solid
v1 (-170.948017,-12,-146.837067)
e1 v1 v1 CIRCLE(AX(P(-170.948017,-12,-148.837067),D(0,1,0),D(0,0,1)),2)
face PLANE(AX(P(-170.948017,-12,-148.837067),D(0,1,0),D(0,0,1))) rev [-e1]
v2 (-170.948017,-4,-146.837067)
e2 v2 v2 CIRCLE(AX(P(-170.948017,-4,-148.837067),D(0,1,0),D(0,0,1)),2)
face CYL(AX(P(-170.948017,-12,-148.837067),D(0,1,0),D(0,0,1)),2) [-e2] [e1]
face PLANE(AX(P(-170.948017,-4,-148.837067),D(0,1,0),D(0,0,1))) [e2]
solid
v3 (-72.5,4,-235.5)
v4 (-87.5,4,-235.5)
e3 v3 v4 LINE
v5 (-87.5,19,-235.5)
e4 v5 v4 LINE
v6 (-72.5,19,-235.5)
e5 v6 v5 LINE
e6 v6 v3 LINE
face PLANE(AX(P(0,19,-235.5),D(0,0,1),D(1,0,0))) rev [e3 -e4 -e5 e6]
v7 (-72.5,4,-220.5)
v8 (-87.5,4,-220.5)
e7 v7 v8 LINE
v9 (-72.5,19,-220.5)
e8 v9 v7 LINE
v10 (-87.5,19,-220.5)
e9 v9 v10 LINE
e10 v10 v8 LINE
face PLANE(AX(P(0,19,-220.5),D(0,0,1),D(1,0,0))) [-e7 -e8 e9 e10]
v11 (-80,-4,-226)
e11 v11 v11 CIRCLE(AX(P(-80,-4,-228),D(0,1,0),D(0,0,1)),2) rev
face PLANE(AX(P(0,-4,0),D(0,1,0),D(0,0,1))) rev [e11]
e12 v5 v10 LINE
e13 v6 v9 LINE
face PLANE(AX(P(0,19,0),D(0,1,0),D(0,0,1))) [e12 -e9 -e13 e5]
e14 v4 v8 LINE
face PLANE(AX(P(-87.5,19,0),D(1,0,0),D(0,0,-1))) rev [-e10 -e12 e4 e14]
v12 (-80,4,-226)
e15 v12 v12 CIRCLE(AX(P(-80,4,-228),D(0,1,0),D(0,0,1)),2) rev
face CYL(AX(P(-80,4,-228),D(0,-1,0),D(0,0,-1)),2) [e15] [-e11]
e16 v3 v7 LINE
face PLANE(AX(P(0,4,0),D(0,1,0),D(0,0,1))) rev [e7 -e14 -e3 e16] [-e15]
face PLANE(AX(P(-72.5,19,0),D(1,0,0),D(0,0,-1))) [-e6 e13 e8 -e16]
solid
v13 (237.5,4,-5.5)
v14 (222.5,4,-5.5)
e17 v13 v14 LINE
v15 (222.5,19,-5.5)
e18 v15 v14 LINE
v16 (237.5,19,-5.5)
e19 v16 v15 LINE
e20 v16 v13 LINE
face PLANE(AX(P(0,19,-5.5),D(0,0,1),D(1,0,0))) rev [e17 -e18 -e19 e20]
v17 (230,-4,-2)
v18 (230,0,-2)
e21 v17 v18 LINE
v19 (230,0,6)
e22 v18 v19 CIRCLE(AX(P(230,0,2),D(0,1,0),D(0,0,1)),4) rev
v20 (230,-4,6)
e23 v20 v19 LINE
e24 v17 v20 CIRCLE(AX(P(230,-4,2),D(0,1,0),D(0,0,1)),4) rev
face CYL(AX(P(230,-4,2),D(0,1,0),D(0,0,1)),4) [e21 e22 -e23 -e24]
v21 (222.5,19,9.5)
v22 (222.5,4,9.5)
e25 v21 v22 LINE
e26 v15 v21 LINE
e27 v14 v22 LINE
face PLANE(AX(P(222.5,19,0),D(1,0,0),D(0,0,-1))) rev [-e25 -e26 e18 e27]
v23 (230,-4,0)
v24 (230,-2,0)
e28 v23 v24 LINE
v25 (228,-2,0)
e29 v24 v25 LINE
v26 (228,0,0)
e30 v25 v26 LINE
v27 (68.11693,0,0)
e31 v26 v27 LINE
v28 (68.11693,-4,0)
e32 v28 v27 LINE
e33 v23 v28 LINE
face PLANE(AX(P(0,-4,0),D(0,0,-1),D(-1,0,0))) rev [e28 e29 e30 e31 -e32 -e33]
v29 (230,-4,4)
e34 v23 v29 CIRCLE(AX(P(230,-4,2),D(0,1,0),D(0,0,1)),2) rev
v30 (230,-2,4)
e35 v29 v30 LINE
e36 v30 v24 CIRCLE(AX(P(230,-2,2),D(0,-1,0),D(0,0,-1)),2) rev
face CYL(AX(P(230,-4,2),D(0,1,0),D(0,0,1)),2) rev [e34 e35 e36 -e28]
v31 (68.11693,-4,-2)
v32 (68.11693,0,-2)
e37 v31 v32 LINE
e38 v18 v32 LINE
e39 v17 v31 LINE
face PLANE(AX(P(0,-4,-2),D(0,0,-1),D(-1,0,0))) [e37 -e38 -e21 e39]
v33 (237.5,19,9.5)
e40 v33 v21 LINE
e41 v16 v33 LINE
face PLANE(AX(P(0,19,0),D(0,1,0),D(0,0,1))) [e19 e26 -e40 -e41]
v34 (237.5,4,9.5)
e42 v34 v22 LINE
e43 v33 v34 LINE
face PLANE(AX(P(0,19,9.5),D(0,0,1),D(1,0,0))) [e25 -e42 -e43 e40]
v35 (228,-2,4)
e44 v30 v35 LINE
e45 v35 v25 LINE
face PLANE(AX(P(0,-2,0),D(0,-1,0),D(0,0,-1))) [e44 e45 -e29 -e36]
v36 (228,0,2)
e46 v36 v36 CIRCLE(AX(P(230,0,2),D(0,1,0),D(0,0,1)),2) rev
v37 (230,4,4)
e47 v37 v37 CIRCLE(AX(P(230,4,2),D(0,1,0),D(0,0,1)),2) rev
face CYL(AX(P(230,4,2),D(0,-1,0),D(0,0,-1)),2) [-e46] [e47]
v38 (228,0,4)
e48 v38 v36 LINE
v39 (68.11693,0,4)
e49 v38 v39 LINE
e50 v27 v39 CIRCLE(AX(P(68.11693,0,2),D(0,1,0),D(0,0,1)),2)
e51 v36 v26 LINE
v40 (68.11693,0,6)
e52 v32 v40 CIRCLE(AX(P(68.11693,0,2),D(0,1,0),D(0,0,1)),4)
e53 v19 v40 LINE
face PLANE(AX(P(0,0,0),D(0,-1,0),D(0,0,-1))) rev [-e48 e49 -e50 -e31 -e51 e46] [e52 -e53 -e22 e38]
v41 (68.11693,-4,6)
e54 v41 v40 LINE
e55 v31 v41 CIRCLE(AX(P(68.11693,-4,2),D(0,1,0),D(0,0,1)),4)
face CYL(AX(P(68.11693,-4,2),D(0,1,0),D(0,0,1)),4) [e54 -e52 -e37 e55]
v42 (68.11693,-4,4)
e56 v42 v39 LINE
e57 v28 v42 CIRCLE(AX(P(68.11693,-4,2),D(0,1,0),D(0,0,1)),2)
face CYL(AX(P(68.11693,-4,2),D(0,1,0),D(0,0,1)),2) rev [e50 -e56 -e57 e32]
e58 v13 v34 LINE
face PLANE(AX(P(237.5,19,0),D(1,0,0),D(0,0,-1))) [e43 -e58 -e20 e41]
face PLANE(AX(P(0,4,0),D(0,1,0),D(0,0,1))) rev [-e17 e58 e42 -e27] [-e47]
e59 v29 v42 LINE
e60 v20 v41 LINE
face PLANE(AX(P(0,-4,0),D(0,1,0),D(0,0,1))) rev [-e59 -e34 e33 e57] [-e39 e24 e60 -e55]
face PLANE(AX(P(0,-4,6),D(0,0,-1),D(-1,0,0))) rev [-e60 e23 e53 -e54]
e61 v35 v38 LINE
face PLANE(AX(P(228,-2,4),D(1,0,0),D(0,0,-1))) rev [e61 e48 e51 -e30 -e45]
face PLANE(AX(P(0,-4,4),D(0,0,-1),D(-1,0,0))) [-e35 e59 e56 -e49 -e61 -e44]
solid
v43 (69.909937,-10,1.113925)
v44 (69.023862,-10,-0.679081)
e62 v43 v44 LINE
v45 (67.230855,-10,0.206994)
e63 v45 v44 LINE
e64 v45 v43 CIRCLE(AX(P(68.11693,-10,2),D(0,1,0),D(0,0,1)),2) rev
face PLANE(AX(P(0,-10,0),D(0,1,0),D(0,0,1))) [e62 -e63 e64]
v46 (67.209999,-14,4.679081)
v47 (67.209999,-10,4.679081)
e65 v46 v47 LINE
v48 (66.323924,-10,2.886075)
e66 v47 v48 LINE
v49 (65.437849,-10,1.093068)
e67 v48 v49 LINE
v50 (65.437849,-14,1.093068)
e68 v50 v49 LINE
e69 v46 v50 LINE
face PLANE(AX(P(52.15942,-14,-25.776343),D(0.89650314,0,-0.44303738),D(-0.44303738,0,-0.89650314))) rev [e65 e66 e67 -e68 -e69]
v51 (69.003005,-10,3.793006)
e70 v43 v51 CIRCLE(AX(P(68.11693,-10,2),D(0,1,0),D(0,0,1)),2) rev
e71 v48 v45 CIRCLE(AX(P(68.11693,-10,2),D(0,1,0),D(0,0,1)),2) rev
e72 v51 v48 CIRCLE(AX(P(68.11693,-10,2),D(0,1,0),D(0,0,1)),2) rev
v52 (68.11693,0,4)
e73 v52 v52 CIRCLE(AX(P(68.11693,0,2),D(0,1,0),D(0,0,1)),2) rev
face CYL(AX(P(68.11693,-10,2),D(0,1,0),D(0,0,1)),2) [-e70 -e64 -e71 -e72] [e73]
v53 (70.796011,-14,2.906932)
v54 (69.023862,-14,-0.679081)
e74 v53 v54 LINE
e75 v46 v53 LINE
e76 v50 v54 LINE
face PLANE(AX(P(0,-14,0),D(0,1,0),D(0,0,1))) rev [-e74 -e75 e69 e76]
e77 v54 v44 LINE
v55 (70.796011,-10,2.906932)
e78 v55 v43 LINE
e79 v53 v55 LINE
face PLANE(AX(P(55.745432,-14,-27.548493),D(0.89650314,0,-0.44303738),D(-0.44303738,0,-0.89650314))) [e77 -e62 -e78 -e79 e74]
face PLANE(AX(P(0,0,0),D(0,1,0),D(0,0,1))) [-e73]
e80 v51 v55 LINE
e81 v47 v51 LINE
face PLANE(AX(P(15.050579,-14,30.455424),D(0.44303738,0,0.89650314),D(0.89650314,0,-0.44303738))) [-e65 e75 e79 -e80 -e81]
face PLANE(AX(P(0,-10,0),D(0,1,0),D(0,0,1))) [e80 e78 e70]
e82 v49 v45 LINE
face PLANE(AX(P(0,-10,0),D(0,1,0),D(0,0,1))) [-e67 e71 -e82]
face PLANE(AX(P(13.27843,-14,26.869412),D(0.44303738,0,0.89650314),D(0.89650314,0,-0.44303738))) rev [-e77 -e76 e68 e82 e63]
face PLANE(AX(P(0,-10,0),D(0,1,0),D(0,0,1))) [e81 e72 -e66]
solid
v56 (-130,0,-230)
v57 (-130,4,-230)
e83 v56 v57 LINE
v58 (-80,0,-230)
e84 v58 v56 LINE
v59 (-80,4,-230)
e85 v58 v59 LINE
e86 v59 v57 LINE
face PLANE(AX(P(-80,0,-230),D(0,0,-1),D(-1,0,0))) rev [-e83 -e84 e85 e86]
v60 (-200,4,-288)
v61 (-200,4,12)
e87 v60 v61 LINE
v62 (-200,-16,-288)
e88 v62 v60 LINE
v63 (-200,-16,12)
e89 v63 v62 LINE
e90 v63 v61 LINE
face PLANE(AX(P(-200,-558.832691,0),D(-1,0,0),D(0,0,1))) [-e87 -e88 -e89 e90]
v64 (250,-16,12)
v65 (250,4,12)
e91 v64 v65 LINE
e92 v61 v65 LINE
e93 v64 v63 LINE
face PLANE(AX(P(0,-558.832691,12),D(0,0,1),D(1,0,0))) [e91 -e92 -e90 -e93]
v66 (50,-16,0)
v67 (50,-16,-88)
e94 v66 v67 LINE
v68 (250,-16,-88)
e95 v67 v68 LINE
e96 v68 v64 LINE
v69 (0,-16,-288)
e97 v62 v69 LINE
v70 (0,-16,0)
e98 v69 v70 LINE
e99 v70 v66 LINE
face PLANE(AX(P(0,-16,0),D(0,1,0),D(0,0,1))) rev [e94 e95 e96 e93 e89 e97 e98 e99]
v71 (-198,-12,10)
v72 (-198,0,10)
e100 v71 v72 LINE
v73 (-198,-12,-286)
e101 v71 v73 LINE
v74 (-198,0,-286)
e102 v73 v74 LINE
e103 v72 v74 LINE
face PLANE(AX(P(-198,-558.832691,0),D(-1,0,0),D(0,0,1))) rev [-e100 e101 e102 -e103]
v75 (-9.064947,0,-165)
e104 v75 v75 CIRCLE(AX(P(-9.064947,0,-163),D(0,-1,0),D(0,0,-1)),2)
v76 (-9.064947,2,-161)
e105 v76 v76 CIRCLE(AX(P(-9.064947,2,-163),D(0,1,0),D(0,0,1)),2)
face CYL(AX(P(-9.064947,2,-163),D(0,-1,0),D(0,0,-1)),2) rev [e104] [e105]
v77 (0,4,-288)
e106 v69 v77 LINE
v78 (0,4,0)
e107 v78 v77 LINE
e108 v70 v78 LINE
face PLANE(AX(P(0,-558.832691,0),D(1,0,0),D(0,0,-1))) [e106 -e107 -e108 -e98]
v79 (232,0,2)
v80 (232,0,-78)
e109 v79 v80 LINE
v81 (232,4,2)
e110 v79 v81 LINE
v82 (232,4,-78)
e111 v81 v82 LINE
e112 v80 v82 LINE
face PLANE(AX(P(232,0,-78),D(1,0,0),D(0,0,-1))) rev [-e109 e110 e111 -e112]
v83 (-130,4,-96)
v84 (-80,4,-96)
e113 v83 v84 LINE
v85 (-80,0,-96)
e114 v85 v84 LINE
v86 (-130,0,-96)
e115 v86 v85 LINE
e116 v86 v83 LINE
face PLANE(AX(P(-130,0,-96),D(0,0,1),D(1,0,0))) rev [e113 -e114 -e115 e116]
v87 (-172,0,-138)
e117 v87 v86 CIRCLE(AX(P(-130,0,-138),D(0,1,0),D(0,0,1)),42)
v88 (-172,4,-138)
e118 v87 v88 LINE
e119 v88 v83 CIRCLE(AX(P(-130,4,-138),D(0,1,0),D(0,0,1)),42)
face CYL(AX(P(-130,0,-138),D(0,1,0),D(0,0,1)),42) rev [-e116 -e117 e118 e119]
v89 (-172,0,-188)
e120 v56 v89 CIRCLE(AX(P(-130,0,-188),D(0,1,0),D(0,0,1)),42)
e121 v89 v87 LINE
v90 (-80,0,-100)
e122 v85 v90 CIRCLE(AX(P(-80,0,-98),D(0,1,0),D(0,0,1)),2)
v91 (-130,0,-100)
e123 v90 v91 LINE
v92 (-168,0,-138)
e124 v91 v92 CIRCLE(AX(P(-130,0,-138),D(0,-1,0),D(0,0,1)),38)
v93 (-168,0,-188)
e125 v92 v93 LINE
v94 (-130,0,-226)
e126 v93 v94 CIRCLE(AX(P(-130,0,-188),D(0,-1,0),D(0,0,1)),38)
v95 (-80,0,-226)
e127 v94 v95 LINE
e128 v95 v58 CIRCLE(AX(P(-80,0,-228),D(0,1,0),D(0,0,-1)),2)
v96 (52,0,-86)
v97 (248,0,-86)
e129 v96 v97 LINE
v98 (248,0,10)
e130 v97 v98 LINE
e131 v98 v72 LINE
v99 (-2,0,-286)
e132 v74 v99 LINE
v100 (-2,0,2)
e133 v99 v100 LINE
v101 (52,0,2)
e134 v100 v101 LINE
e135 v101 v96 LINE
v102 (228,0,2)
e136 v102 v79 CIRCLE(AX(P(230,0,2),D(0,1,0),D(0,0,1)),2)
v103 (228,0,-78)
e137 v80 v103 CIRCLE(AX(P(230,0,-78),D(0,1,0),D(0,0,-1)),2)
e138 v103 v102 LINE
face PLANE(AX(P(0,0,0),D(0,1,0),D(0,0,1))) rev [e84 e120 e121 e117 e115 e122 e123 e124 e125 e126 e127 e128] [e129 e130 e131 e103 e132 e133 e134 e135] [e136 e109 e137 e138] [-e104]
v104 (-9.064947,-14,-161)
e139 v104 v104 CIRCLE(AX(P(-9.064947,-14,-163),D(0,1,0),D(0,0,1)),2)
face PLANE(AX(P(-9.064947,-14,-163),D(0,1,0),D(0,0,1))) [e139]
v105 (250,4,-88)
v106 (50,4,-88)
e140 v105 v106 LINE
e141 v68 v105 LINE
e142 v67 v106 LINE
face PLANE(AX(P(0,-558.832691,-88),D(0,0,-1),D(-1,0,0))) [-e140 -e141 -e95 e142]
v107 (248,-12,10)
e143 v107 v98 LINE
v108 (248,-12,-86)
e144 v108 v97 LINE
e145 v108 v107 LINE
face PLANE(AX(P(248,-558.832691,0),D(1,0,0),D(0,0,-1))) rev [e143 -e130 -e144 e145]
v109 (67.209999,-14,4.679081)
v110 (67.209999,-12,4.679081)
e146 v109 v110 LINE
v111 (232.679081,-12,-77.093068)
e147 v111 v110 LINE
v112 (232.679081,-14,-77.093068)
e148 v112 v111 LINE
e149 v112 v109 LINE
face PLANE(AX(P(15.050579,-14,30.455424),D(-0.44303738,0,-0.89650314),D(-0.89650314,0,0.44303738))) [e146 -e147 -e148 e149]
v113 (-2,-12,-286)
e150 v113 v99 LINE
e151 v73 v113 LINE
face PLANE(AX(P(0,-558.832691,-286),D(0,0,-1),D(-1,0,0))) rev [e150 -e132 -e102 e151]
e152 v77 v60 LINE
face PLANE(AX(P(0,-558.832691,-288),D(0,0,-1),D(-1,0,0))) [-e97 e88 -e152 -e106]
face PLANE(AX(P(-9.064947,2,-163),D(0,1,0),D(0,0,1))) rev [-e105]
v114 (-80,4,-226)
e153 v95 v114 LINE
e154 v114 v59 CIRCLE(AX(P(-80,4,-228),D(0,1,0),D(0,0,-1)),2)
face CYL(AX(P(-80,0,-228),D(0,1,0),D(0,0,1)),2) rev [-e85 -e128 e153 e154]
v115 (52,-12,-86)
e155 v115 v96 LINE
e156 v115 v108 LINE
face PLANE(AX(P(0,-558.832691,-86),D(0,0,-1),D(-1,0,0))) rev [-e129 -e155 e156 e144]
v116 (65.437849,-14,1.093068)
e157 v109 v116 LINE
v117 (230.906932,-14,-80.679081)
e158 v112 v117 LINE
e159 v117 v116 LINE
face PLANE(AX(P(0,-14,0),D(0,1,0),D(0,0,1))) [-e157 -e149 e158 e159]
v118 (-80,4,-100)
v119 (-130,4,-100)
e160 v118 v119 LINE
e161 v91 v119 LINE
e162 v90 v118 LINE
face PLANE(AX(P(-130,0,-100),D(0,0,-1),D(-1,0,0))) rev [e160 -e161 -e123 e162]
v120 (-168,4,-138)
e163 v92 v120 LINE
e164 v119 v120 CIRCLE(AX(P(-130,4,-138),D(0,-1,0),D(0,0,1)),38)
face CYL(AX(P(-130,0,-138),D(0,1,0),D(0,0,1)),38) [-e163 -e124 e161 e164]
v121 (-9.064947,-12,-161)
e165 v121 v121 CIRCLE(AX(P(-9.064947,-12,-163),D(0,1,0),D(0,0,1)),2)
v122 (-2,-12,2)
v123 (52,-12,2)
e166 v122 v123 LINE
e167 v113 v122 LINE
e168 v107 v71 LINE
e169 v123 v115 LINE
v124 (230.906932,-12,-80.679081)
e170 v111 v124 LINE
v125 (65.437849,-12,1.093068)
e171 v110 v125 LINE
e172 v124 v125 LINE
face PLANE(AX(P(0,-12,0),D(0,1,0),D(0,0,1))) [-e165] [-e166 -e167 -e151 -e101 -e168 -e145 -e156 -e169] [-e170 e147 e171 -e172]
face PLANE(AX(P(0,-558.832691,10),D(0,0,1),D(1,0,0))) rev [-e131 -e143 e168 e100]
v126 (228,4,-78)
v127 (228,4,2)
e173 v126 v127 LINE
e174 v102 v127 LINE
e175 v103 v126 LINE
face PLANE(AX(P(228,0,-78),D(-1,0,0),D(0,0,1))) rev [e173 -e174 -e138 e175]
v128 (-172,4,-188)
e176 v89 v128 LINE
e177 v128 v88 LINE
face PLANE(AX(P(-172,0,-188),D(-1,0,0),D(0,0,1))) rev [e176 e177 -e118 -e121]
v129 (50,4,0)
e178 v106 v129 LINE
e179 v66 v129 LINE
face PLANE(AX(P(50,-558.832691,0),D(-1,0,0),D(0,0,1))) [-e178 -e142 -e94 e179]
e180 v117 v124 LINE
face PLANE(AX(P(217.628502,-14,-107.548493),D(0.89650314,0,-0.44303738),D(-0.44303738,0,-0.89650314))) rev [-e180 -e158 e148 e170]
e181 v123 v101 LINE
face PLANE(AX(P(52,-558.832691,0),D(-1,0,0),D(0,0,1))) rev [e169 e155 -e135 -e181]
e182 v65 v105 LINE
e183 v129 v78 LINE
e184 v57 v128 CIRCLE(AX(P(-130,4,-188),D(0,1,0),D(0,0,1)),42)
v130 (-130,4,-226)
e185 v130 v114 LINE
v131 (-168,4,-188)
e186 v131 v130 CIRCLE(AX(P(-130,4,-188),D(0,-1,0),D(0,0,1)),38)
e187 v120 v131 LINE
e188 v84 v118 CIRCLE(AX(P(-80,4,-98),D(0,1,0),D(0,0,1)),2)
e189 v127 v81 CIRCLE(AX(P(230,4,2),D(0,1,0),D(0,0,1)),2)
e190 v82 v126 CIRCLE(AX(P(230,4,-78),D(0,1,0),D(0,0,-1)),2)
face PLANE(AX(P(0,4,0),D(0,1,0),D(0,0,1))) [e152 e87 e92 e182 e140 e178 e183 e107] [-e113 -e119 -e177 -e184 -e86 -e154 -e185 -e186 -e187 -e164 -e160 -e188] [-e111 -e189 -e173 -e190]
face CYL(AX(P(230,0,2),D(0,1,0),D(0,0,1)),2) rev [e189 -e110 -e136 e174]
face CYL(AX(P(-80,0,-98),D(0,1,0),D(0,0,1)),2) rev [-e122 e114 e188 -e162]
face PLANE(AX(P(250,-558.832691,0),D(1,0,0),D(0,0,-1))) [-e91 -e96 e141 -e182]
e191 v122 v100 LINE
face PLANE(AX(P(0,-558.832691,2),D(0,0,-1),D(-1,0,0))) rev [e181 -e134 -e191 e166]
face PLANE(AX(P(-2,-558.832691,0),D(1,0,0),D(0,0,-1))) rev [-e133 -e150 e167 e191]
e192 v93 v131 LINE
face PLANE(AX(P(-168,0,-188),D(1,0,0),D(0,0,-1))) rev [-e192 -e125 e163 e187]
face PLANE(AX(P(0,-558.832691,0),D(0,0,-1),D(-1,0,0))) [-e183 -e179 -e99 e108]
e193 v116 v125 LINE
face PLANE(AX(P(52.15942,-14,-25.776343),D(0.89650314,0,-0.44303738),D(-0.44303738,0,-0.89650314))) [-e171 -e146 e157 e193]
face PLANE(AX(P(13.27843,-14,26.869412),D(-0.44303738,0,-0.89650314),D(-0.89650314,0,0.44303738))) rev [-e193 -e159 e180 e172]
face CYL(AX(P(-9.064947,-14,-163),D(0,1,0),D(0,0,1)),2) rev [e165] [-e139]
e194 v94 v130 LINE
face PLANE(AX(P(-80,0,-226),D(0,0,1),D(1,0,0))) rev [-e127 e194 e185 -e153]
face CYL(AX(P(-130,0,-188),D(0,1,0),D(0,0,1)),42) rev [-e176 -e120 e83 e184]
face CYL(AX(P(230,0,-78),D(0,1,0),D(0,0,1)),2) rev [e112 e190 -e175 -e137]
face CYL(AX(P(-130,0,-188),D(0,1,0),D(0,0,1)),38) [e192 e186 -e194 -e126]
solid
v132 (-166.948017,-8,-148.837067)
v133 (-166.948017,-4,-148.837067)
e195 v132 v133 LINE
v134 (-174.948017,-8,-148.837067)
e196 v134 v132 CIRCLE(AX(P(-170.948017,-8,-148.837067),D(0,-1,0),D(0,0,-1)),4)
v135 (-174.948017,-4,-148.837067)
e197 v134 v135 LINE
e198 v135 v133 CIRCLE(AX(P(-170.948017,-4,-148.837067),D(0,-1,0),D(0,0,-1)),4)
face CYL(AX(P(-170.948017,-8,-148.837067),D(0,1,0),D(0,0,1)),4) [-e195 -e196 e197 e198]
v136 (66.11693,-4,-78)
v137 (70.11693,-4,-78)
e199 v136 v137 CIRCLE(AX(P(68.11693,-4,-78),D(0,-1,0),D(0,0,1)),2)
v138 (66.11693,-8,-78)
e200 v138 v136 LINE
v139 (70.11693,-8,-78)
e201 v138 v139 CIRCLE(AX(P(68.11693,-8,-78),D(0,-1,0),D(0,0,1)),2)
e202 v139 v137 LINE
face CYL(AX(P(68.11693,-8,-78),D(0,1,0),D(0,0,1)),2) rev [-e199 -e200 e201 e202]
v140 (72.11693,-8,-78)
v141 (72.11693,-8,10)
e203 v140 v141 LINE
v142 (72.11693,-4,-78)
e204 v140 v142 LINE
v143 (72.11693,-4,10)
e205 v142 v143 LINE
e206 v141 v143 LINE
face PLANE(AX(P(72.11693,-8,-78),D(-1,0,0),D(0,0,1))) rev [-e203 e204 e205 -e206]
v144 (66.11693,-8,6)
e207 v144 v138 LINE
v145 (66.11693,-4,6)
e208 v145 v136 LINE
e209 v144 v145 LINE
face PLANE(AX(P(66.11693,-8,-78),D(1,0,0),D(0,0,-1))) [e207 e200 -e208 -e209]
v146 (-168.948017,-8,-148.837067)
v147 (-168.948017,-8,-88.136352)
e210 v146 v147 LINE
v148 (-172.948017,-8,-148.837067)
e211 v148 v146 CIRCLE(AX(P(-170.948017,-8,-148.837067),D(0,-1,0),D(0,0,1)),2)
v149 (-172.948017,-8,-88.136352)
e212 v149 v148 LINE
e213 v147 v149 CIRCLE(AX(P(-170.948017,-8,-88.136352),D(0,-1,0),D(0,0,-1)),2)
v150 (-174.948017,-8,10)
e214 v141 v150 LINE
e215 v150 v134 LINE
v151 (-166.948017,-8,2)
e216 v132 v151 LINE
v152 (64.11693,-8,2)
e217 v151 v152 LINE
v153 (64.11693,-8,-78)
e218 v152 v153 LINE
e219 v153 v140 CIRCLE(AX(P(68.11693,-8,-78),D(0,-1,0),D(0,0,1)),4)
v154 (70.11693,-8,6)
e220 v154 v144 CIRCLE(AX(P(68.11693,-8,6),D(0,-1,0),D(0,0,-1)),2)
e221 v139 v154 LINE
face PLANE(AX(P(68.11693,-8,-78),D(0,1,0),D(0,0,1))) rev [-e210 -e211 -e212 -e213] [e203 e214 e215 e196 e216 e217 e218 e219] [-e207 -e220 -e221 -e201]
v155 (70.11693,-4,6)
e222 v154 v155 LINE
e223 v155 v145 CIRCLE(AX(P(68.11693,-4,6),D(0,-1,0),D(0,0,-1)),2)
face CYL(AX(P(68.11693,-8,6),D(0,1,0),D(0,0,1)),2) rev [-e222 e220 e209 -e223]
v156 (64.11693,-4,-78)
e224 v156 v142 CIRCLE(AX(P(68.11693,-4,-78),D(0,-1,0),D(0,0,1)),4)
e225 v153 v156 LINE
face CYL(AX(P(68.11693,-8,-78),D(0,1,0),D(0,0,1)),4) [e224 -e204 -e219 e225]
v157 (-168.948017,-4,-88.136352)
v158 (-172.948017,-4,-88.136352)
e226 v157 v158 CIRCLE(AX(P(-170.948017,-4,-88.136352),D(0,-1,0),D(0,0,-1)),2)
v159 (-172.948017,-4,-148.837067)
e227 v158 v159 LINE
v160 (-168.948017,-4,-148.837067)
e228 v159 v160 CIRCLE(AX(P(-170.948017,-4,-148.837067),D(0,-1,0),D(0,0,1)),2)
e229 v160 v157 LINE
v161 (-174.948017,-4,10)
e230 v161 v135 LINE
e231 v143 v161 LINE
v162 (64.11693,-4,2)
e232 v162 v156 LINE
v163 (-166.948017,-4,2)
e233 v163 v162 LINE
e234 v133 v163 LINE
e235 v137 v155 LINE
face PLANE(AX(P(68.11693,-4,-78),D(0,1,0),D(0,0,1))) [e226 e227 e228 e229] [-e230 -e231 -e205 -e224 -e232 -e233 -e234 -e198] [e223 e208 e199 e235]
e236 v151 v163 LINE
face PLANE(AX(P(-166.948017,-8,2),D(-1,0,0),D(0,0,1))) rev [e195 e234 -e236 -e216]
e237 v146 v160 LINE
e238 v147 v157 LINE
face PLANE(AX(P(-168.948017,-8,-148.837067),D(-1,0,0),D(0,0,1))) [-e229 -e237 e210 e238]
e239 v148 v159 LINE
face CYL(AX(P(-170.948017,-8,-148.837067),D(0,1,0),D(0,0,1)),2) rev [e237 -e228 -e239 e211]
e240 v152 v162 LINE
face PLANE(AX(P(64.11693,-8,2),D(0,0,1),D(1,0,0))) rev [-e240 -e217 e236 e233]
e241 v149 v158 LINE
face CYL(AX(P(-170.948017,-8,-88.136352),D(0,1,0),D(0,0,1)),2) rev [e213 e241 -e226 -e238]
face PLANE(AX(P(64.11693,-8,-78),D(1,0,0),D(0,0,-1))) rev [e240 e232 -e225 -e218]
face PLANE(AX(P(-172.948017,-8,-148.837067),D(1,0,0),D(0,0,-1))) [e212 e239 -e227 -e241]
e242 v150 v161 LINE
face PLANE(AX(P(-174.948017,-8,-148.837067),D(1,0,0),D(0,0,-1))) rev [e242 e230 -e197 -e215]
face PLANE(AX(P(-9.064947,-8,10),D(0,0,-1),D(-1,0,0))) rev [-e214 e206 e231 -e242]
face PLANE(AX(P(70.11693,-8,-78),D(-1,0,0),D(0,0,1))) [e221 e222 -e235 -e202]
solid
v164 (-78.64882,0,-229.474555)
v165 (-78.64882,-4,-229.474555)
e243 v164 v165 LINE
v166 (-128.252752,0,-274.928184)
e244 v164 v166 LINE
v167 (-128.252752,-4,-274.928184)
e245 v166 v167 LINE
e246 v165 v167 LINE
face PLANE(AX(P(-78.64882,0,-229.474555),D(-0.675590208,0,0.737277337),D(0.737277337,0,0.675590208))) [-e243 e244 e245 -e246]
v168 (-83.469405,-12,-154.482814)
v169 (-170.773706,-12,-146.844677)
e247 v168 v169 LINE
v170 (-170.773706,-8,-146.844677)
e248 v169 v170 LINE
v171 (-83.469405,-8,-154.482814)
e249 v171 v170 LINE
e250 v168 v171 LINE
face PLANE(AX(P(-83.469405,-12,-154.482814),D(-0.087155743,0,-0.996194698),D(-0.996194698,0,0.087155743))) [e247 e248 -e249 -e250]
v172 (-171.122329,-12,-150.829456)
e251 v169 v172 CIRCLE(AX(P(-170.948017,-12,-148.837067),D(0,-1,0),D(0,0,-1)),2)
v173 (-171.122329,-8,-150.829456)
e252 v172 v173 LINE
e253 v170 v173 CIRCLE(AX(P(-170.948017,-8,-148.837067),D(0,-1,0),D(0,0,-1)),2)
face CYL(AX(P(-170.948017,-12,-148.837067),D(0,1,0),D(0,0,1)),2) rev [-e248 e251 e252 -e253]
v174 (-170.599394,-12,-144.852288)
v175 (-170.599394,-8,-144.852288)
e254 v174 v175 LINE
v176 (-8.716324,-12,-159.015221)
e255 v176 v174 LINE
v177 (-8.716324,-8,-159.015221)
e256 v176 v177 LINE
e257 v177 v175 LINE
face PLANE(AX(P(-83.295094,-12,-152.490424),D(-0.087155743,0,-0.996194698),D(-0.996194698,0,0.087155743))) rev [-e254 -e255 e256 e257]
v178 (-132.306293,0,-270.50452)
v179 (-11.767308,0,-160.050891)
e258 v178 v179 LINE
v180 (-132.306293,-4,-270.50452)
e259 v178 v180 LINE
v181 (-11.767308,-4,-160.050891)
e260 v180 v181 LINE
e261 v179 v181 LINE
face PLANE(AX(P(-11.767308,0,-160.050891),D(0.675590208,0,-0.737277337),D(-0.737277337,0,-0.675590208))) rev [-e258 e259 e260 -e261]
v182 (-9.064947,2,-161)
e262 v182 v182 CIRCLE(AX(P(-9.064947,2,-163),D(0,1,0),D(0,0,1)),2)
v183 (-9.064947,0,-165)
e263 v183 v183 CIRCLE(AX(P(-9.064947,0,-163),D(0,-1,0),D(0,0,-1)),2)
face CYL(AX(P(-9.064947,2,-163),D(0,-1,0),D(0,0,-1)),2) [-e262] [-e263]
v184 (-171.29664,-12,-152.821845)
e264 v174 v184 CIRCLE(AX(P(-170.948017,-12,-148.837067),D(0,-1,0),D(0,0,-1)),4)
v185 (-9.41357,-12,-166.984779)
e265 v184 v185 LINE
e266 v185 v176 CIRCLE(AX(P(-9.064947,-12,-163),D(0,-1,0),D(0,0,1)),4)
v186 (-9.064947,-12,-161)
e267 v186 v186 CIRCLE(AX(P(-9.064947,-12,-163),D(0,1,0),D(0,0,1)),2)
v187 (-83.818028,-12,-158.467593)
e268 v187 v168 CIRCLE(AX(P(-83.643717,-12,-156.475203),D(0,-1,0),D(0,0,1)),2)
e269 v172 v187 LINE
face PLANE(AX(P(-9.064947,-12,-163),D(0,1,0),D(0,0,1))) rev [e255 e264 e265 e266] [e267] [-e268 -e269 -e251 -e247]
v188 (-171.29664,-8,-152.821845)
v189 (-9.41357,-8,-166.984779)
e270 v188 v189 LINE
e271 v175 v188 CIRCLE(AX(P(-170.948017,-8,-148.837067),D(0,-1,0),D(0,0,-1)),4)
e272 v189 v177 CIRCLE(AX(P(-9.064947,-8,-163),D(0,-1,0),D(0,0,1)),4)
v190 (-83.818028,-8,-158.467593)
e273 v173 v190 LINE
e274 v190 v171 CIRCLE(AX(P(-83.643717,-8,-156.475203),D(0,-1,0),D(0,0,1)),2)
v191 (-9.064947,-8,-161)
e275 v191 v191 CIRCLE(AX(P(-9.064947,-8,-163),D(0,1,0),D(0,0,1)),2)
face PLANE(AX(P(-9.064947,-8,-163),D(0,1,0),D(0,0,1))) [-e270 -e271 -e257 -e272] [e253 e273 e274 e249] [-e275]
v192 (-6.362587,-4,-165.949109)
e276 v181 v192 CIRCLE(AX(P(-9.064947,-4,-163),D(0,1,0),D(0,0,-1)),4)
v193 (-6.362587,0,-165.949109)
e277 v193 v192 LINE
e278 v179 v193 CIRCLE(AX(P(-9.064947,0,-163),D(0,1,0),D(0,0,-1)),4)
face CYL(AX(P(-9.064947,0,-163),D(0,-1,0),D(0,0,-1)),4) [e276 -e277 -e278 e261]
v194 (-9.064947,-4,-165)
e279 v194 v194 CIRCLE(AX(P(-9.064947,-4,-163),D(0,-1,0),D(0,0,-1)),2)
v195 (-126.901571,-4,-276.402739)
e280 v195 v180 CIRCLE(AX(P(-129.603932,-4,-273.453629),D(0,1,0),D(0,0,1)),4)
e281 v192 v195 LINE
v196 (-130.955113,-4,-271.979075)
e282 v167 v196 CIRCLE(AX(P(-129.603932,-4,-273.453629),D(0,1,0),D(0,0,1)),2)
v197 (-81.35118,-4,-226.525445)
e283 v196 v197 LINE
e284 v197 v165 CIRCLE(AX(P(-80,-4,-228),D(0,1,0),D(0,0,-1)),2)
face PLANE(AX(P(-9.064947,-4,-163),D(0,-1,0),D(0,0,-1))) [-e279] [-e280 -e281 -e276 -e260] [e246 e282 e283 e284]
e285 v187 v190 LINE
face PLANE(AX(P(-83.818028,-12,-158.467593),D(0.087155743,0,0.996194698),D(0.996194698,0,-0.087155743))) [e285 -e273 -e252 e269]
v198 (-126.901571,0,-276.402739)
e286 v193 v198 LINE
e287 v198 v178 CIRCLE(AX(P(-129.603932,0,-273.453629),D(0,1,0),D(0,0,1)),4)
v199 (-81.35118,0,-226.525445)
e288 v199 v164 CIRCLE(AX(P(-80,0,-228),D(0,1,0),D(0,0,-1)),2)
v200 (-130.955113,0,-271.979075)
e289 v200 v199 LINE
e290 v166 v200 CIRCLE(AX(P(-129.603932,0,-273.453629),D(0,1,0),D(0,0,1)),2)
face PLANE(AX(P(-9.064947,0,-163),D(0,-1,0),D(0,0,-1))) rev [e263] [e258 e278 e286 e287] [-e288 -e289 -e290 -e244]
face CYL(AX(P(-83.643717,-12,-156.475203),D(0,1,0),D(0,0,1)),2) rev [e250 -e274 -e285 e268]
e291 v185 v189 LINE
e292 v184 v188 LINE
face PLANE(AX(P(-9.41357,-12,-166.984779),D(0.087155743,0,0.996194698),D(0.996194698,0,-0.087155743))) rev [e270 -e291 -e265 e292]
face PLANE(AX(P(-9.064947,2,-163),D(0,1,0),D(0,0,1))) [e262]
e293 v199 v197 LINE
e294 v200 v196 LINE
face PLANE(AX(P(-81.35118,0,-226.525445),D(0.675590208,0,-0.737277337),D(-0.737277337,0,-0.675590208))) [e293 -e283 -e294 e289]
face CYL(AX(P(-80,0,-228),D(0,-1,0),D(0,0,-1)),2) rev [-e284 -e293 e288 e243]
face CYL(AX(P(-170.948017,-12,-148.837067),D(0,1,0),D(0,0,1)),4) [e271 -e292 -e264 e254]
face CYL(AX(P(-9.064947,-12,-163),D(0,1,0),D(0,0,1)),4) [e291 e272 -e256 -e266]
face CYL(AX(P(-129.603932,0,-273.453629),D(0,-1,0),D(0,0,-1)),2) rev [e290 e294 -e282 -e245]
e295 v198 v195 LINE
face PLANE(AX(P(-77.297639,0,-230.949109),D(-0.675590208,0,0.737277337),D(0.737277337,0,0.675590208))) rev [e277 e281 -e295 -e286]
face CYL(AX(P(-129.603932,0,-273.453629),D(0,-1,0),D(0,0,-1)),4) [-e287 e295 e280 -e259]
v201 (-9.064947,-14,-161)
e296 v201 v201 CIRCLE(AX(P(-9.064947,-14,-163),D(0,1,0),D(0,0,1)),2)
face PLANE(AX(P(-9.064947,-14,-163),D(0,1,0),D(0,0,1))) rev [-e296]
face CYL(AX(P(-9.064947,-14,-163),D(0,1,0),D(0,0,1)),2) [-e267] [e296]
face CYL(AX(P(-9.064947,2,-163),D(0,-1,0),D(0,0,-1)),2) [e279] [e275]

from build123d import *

# Parameters (mm, degrees)
BOSS_EXTRUDE1_DEPTH       = 4
SKETCH3_3_R               = 2
BOSS_EXTRUDE2_DEPTH       = 4
BOSS_EXTRUDE3_DEPTH       = 2
BOSS_EXTRUDE4_START       = 4
SKETCH3_5_W               = 15
SKETCH3_5_H               = 15
BOSS_EXTRUDE4_DEPTH       = 15
BOSS_EXTRUDE5_DEPTH       = 4
BOSS_EXTRUDE6_DEPTH       = 4
SKETCH6_R                 = 2
BOSS_EXTRUDE7_DEPTH       = 10
BOSS_EXTRUDE8_START       = -4
SKETCH6_3_R               = 2
BOSS_EXTRUDE8_DEPTH       = 2
BOSS_EXTRUDE9_DEPTH       = 4
SKETCH8_R                 = 2
BOSS_EXTRUDE10_DEPTH      = 8
BOSS_EXTRUDE11_DEPTH      = 4
BOSS_EXTRUDE12_START      = 4
SKETCH9_3_W               = 15
SKETCH9_3_H               = 15
BOSS_EXTRUDE12_DEPTH      = 15
SKETCH10_R                = 2
BOSS_EXTRUDE13_DEPTH      = 10
BOSS_EXTRUDE14_START      = -10
BOSS_EXTRUDE14_DEPTH      = 4
BOSS_EXTRUDE15_DEPTH      = 4
BOSS_EXTRUDE15_DEPTH_BACK = 16
SHELL8_START              = -198
SHELL8_OUTLINE_W          = 16
SHELL8_OUTLINE_H          = 296
SHELL8_DEPTH              = 196
SHELL8_START_2            = 52
SHELL8_2_OUTLINE_W        = 16
SHELL8_2_OUTLINE_H        = 96
SHELL8_2_DEPTH            = 196
SHELL8_START_3            = -2
SHELL8_3_OUTLINE_W        = 16
SHELL8_3_OUTLINE_H        = 8
SHELL8_3_DEPTH            = 54
BOSS_EXTRUDE16_DEPTH      = 4
BOSS_EXTRUDE17_START      = -16
BOSS_EXTRUDE17_DEPTH      = 4
CUT_EXTRUDE1_DEPTH        = 4
INDENT1_START             = -14
INDENT1_OUTLINE_R         = 2
INDENT1_DEPTH             = 16
CUT_EXTRUDE2_DEPTH        = 2


# Read off the part's stored shape, not the designer's step: Shell8, Indent1
with BuildPart() as part:
    # Sketch3 → Boss-Extrude1 (new body)
    with BuildSketch(Plane(origin=(0, 0, 0), x_dir=(1, 0, 0), z_dir=(0, 1, 0))):
        with BuildLine():
            Line((222.5, -6), (222.5, -4))
            Line((222.5, -4), (68.116930232, -4))
            ThreePointArc((68.116930232, -4), (66.116930232, -2), (68.116930232, 0))
            Line((68.116930232, 0), (222.5, 0))
            Line((222.5, 0), (222.5, 2))
            Line((222.5, 2), (68.116930232, 2))
            ThreePointArc((68.116930232, 2), (64.116930232, -2), (68.116930232, -6))
            Line((68.116930232, -6), (222.5, -6))
        make_face()
        with BuildLine():
            Line((230, -4), (228, -4))
            Line((228, -4), (222.5, -4))
            Line((222.5, -4), (222.5, -6))
            Line((222.5, -6), (230, -6))
            ThreePointArc((230, -6), (234, -2), (230, 2))
            Line((230, 2), (222.5, 2))
            Line((222.5, 2), (222.5, 0))
            Line((222.5, 0), (228, 0))
            Line((228, 0), (230, 0))
            Line((230, 0), (232, 0))
            Line((232, 0), (232, -2))
            Line((232, -2), (232, -4))
            Line((232, -4), (230, -4))
        make_face()
        with BuildLine():
            ThreePointArc((232, -2), (231.414213562, -3.414213562), (230, -4))
            Line((230, -4), (232, -4))
            Line((232, -4), (232, -2))
        make_face()
        with BuildLine():
            Line((232, 0), (230, 0))
            ThreePointArc((230, 0), (231.414213562, -0.585786438), (232, -2))
            Line((232, -2), (232, 0))
        make_face()
    extrude(amount=-BOSS_EXTRUDE1_DEPTH)



with BuildPart() as body_2:
    # Sketch3<3> → Boss-Extrude2 (new body)
    with BuildSketch(Plane(origin=(0, 0, 0), x_dir=(1, 0, 0), z_dir=(0, 1, 0))):
        with Locations(Location((230, -2, 0), (0, 0, 270))):
            Circle(SKETCH3_3_R)
    extrude(amount=BOSS_EXTRUDE2_DEPTH)


with BuildPart() as part_1:
    add(part.part)

    add(body_2.part)  # Boss-Extrude3 merges body 2
    # Sketch3<4> → Boss-Extrude3 (add)
    with BuildSketch(Plane(origin=(0, 0, 0), x_dir=(1, 0, 0), z_dir=(0, 1, 0))):
        with BuildLine():
            Line((228, -4), (230, -4))
            ThreePointArc((230, -4), (232, -2), (230, 0))
            Line((230, 0), (228, 0))
            Line((228, 0), (228, -2))
            Line((228, -2), (228, -4))
        make_face()
    extrude(amount=-BOSS_EXTRUDE3_DEPTH)

    # Sketch3<5> → Boss-Extrude4 (add)
    with BuildSketch(Plane(origin=(0, 0, 0), x_dir=(1, 0, 0), z_dir=(0, 1, 0)).offset(BOSS_EXTRUDE4_START)):
        with Locations((230, -2)):
            Rectangle(SKETCH3_5_W, SKETCH3_5_H)
    extrude(amount=BOSS_EXTRUDE4_DEPTH)


with BuildPart() as body_2_2:
    # Sketch4 → Boss-Extrude5 (new body)
    with BuildSketch(Plane.XZ.offset(4)):
        with BuildLine():
            Line((72.116930232, -78), (72.116930232, 10))
            Line((72.116930232, 10), (-9.06494743, 10))
            Line((-9.06494743, 10), (-174.948017199, 10))
            Line((-174.948017199, 10), (-174.948017199, -88.136351977))
            Line((-174.948017199, -88.136351977), (-174.948017199, -148.837066579))
            ThreePointArc((-174.948017199, -148.837066579), (-170.948017199, -152.837066579), (-166.948017199, -148.837066579))
            Line((-166.948017199, -148.837066579), (-166.948017199, -88.136351977))
            Line((-166.948017199, -88.136351977), (-166.948017199, 2))
            Line((-166.948017199, 2), (-9.06494743, 2))
            Line((-9.06494743, 2), (64.116930232, 2))
            Line((64.116930232, 2), (64.116930232, -78))
            ThreePointArc((64.116930232, -78), (68.116930232, -82), (72.116930232, -78))
        make_face()
        with BuildLine():
            Line((-168.948017199, -148.837066579), (-168.948017199, -88.136351977))
            ThreePointArc((-168.948017199, -88.136351977), (-170.948017199, -86.136351977), (-172.948017199, -88.136351977))
            Line((-172.948017199, -88.136351977), (-172.948017199, -148.837066579))
            ThreePointArc((-172.948017199, -148.837066579), (-170.948017199, -150.837066579), (-168.948017199, -148.837066579))
        make_face(mode=Mode.SUBTRACT)
        with BuildLine():
            Line((70.116930232, -78), (70.116930232, 6))
            ThreePointArc((70.116930232, 6), (68.116930232, 8), (66.116930232, 6))
            Line((66.116930232, 6), (66.116930232, -78))
            ThreePointArc((66.116930232, -78), (68.116930232, -80), (70.116930232, -78))
        make_face(mode=Mode.SUBTRACT)
    extrude(amount=BOSS_EXTRUDE5_DEPTH)


with BuildPart() as body_3:
    # Sketch5 → Boss-Extrude6 (new body)
    with BuildSketch(Plane.XZ.offset(8)):
        with BuildLine():
            Line((-8.71632446, -159.015221208), (-83.295093699, -152.490424359))
            Line((-83.295093699, -152.490424359), (-170.599394228, -144.852287786))
            ThreePointArc((-170.599394228, -144.852287786), (-174.932795991, -148.488443608), (-171.29664017, -152.821845371))
            Line((-171.29664017, -152.821845371), (-83.992339641, -160.459981944))
            Line((-83.992339641, -160.459981944), (-9.413570401, -166.984778792))
            ThreePointArc((-9.413570401, -166.984778792), (-5.080168638, -163.348622971), (-8.71632446, -159.015221208))
        make_face()
        with BuildLine():
            Line((-83.469405185, -154.482813756), (-170.773705713, -146.844677182))
            ThreePointArc((-170.773705713, -146.844677182), (-172.940406595, -148.662755093), (-171.122328684, -150.829455975))
            Line((-171.122328684, -150.829455975), (-83.818028156, -158.467592548))
            ThreePointArc((-83.818028156, -158.467592548), (-81.651327274, -156.649514637), (-83.469405185, -154.482813756))
        make_face(mode=Mode.SUBTRACT)
    extrude(amount=BOSS_EXTRUDE6_DEPTH)

    # Sketch6 → Boss-Extrude7 (add)
    with BuildSketch(Plane(origin=(0, -8, 0), x_dir=(1, 0, 0), z_dir=(0, 1, 0))):
        with Locations(Location((-9.06494743, 163, 0), (0, 0, 270))):
            Circle(SKETCH6_R)
    extrude(amount=BOSS_EXTRUDE7_DEPTH)

    # Sketch6<3> → Boss-Extrude8 (add)
    with BuildSketch(Plane(origin=(0, -8, 0), x_dir=(1, 0, 0), z_dir=(0, 1, 0)).offset(BOSS_EXTRUDE8_START)):
        with Locations(Location((-9.06494743, 163, 0), (0, 0, 270))):
            Circle(SKETCH6_3_R)
    extrude(amount=-BOSS_EXTRUDE8_DEPTH)

    # Sketch7 → Boss-Extrude9 (add)
    with BuildSketch(Plane(origin=(0, -4, 0), x_dir=(1, 0, 0), z_dir=(0, 1, 0))):
        with BuildLine():
            Line((-6.3625866, 165.949109347), (-77.29763917, 230.949109347))
            Line((-77.29763917, 230.949109347), (-126.901571386, 276.402738791))
            ThreePointArc((-126.901571386, 276.402738791), (-132.553041564, 276.155990274), (-132.306293047, 270.504520097))
            Line((-132.306293047, 270.504520097), (-82.70236083, 225.050890653))
            Line((-82.70236083, 225.050890653), (-11.767308261, 160.050890653))
            ThreePointArc((-11.767308261, 160.050890653), (-6.115838083, 160.29763917), (-6.3625866, 165.949109347))
        make_face()
        with BuildLine():
            Line((-78.648819585, 229.474554674), (-128.252751801, 274.928184118))
            ThreePointArc((-128.252751801, 274.928184118), (-131.07848689, 274.804809859), (-130.955112632, 271.97907477))
            Line((-130.955112632, 271.97907477), (-81.351180415, 226.525445326))
            ThreePointArc((-81.351180415, 226.525445326), (-78.525445326, 226.648819585), (-78.648819585, 229.474554674))
        make_face(mode=Mode.SUBTRACT)
    extrude(amount=BOSS_EXTRUDE9_DEPTH)


with BuildPart() as body_4:
    # Sketch8 → Boss-Extrude10 (new body)
    with BuildSketch(Plane(origin=(0, -4, 0), x_dir=(1, 0, 0), z_dir=(0, 1, 0))):
        with Locations(Location((-170.948017199, 148.837066579, 0), (0, 0, 270))):
            Circle(SKETCH8_R)
    extrude(amount=-BOSS_EXTRUDE10_DEPTH)


with BuildPart() as body_5:
    # Sketch9 → Boss-Extrude11 (new, symmetric)
    with BuildSketch(Plane(origin=(0, 0, 0), x_dir=(1, 0, 0), z_dir=(0, 1, 0))):
        with BuildLine():
            ThreePointArc((-81.351180415, 226.525445326), (-79.19450662, 226.169377042), (-78, 228))
            ThreePointArc((-78, 228), (-78.169377042, 228.80549338), (-78.648819585, 229.474554674))
            ThreePointArc((-78.648819585, 229.474554674), (-81.474554674, 229.351180415), (-81.351180415, 226.525445326))
        make_face()
    extrude(amount=BOSS_EXTRUDE11_DEPTH, both=True)

    # Sketch9<3> → Boss-Extrude12 (add)
    with BuildSketch(Plane(origin=(0, 0, 0), x_dir=(1, 0, 0), z_dir=(0, 1, 0)).offset(BOSS_EXTRUDE12_START)):
        with Locations((-80, 228)):
            Rectangle(SKETCH9_3_W, SKETCH9_3_H)
    extrude(amount=BOSS_EXTRUDE12_DEPTH)


with BuildPart() as body_6:
    # Sketch10 → Boss-Extrude13 (new body)
    with BuildSketch(Plane(origin=(0, 0, 0), x_dir=(1, 0, 0), z_dir=(0, 1, 0))):
        with Locations(Location((68.116930232, -2, 0), (0, 0, 270))):
            Circle(SKETCH10_R)
    extrude(amount=-BOSS_EXTRUDE13_DEPTH)

    # Sketch10<3> → Boss-Extrude14 (add)
    with BuildSketch(Plane(origin=(0, 0, 0), x_dir=(1, 0, 0), z_dir=(0, 1, 0)).offset(BOSS_EXTRUDE14_START)):
        Polygon((67.209998713, -4.67908104), (70.796011272, -2.906931518), (69.02386175, 0.67908104), (65.437849192, -1.093068482), align=None)
    extrude(amount=-BOSS_EXTRUDE14_DEPTH)


with BuildPart() as body_7:
    # Sketch1 → Boss-Extrude15 (new, two sides: drawn at the far end of the back side and taken through both)
    with BuildSketch(Plane(origin=(0, 0, 0), x_dir=(1, 0, 0), z_dir=(0, 1, 0)).offset(-BOSS_EXTRUDE15_DEPTH_BACK)):
        Polygon((0, 0), (0, 288), (-200, 288), (-200, -12), (250, -12), (250, 88), (50, 88), (50, 0), align=None)
    extrude(amount=BOSS_EXTRUDE15_DEPTH + BOSS_EXTRUDE15_DEPTH_BACK)

    # Shell8 outline → Shell8 (cut)
    with BuildSketch(Plane.YZ.offset(SHELL8_START)):
        with Locations((-6, -138)):
            Rectangle(SHELL8_OUTLINE_W, SHELL8_OUTLINE_H)
    extrude(amount=SHELL8_DEPTH, mode=Mode.SUBTRACT)

    # Shell8 2 outline → Shell8 2 (cut)
    with BuildSketch(Plane.YZ.offset(SHELL8_START_2)):
        with Locations((-6, -38)):
            Rectangle(SHELL8_2_OUTLINE_W, SHELL8_2_OUTLINE_H)
    extrude(amount=SHELL8_2_DEPTH, mode=Mode.SUBTRACT)

    # Shell8 3 outline → Shell8 3 (cut)
    with BuildSketch(Plane.YZ.offset(SHELL8_START_3)):
        with Locations((-6, 6)):
            Rectangle(SHELL8_3_OUTLINE_W, SHELL8_3_OUTLINE_H)
    extrude(amount=SHELL8_3_DEPTH, mode=Mode.SUBTRACT)

    # Sketch1<3> → Boss-Extrude16 (add)
    with BuildSketch(Plane(origin=(0, 0, 0), x_dir=(1, 0, 0), z_dir=(0, 1, 0))):
        Polygon((0, 0), (0, 288), (-200, 288), (-200, -12), (250, -12), (250, 88), (50, 88), (50, 0), align=None)
    extrude(amount=BOSS_EXTRUDE16_DEPTH)

    # Sketch1<4> → Boss-Extrude17 (add)
    with BuildSketch(Plane(origin=(0, 0, 0), x_dir=(1, 0, 0), z_dir=(0, 1, 0)).offset(BOSS_EXTRUDE17_START)):
        Polygon((0, 0), (0, 288), (-200, 288), (-200, -12), (250, -12), (250, 88), (50, 88), (50, 0), align=None)
    extrude(amount=BOSS_EXTRUDE17_DEPTH)

    # Sketch11 → Cut-Extrude1 (cut)
    with BuildSketch(Plane(origin=(0, 4, 0), x_dir=(1, 0, 0), z_dir=(0, 1, 0))):
        with BuildLine():
            Line((-80, 230), (-130, 230))
            ThreePointArc((-130, 230), (-159.69848481, 217.69848481), (-172, 188))
            Line((-172, 188), (-172, 138))
            ThreePointArc((-172, 138), (-159.69848481, 108.30151519), (-130, 96))
            Line((-130, 96), (-80, 96))
            ThreePointArc((-80, 96), (-78, 98), (-80, 100))
            Line((-80, 100), (-130, 100))
            ThreePointArc((-130, 100), (-156.870057685, 111.129942315), (-168, 138))
            Line((-168, 138), (-168, 188))
            ThreePointArc((-168, 188), (-156.870057685, 214.870057685), (-130, 226))
            Line((-130, 226), (-80, 226))
            ThreePointArc((-80, 226), (-78, 228), (-80, 230))
        make_face()
        with BuildLine():
            Line((228, 78), (228, -2))
            ThreePointArc((228, -2), (230, -4), (232, -2))
            Line((232, -2), (232, 78))
            ThreePointArc((232, 78), (230, 80), (228, 78))
        make_face()
    extrude(amount=-CUT_EXTRUDE1_DEPTH, mode=Mode.SUBTRACT)

    # Indent1 outline → Indent1 (cut)
    with BuildSketch(Plane(origin=(0, 0, 0), x_dir=(1, 0, 0), z_dir=(0, 1, 0)).offset(INDENT1_START)):
        with Locations((-9.06494743, 163)):
            Circle(INDENT1_OUTLINE_R)
    extrude(amount=INDENT1_DEPTH, mode=Mode.SUBTRACT)

    # Sketch13 → Cut-Extrude2 (cut)
    with BuildSketch(Plane(origin=(0, -12, 0), x_dir=(1, 0, 0), z_dir=(0, 1, 0))):
        Polygon((232.67908104, 77.093068482), (230.906931518, 80.67908104), (227.32091896, 78.906931518), (229.093068482, 75.32091896), align=None)
        Polygon((70.796011272, -2.906931518), (69.02386175, 0.67908104), (67.230855471, -0.206993721), (65.437849192, -1.093068482), (67.209998713, -4.67908104), (69.003004993, -3.793006279), align=None)
        Polygon((229.093068482, 75.32091896), (227.32091896, 78.906931518), (69.02386175, 0.67908104), (70.796011272, -2.906931518), align=None)
    extrude(amount=-CUT_EXTRUDE2_DEPTH, mode=Mode.SUBTRACT)


solid = Compound([part_1.part, body_2_2.part, body_3.part, body_4.part, body_5.part, body_6.part, body_7.part])
